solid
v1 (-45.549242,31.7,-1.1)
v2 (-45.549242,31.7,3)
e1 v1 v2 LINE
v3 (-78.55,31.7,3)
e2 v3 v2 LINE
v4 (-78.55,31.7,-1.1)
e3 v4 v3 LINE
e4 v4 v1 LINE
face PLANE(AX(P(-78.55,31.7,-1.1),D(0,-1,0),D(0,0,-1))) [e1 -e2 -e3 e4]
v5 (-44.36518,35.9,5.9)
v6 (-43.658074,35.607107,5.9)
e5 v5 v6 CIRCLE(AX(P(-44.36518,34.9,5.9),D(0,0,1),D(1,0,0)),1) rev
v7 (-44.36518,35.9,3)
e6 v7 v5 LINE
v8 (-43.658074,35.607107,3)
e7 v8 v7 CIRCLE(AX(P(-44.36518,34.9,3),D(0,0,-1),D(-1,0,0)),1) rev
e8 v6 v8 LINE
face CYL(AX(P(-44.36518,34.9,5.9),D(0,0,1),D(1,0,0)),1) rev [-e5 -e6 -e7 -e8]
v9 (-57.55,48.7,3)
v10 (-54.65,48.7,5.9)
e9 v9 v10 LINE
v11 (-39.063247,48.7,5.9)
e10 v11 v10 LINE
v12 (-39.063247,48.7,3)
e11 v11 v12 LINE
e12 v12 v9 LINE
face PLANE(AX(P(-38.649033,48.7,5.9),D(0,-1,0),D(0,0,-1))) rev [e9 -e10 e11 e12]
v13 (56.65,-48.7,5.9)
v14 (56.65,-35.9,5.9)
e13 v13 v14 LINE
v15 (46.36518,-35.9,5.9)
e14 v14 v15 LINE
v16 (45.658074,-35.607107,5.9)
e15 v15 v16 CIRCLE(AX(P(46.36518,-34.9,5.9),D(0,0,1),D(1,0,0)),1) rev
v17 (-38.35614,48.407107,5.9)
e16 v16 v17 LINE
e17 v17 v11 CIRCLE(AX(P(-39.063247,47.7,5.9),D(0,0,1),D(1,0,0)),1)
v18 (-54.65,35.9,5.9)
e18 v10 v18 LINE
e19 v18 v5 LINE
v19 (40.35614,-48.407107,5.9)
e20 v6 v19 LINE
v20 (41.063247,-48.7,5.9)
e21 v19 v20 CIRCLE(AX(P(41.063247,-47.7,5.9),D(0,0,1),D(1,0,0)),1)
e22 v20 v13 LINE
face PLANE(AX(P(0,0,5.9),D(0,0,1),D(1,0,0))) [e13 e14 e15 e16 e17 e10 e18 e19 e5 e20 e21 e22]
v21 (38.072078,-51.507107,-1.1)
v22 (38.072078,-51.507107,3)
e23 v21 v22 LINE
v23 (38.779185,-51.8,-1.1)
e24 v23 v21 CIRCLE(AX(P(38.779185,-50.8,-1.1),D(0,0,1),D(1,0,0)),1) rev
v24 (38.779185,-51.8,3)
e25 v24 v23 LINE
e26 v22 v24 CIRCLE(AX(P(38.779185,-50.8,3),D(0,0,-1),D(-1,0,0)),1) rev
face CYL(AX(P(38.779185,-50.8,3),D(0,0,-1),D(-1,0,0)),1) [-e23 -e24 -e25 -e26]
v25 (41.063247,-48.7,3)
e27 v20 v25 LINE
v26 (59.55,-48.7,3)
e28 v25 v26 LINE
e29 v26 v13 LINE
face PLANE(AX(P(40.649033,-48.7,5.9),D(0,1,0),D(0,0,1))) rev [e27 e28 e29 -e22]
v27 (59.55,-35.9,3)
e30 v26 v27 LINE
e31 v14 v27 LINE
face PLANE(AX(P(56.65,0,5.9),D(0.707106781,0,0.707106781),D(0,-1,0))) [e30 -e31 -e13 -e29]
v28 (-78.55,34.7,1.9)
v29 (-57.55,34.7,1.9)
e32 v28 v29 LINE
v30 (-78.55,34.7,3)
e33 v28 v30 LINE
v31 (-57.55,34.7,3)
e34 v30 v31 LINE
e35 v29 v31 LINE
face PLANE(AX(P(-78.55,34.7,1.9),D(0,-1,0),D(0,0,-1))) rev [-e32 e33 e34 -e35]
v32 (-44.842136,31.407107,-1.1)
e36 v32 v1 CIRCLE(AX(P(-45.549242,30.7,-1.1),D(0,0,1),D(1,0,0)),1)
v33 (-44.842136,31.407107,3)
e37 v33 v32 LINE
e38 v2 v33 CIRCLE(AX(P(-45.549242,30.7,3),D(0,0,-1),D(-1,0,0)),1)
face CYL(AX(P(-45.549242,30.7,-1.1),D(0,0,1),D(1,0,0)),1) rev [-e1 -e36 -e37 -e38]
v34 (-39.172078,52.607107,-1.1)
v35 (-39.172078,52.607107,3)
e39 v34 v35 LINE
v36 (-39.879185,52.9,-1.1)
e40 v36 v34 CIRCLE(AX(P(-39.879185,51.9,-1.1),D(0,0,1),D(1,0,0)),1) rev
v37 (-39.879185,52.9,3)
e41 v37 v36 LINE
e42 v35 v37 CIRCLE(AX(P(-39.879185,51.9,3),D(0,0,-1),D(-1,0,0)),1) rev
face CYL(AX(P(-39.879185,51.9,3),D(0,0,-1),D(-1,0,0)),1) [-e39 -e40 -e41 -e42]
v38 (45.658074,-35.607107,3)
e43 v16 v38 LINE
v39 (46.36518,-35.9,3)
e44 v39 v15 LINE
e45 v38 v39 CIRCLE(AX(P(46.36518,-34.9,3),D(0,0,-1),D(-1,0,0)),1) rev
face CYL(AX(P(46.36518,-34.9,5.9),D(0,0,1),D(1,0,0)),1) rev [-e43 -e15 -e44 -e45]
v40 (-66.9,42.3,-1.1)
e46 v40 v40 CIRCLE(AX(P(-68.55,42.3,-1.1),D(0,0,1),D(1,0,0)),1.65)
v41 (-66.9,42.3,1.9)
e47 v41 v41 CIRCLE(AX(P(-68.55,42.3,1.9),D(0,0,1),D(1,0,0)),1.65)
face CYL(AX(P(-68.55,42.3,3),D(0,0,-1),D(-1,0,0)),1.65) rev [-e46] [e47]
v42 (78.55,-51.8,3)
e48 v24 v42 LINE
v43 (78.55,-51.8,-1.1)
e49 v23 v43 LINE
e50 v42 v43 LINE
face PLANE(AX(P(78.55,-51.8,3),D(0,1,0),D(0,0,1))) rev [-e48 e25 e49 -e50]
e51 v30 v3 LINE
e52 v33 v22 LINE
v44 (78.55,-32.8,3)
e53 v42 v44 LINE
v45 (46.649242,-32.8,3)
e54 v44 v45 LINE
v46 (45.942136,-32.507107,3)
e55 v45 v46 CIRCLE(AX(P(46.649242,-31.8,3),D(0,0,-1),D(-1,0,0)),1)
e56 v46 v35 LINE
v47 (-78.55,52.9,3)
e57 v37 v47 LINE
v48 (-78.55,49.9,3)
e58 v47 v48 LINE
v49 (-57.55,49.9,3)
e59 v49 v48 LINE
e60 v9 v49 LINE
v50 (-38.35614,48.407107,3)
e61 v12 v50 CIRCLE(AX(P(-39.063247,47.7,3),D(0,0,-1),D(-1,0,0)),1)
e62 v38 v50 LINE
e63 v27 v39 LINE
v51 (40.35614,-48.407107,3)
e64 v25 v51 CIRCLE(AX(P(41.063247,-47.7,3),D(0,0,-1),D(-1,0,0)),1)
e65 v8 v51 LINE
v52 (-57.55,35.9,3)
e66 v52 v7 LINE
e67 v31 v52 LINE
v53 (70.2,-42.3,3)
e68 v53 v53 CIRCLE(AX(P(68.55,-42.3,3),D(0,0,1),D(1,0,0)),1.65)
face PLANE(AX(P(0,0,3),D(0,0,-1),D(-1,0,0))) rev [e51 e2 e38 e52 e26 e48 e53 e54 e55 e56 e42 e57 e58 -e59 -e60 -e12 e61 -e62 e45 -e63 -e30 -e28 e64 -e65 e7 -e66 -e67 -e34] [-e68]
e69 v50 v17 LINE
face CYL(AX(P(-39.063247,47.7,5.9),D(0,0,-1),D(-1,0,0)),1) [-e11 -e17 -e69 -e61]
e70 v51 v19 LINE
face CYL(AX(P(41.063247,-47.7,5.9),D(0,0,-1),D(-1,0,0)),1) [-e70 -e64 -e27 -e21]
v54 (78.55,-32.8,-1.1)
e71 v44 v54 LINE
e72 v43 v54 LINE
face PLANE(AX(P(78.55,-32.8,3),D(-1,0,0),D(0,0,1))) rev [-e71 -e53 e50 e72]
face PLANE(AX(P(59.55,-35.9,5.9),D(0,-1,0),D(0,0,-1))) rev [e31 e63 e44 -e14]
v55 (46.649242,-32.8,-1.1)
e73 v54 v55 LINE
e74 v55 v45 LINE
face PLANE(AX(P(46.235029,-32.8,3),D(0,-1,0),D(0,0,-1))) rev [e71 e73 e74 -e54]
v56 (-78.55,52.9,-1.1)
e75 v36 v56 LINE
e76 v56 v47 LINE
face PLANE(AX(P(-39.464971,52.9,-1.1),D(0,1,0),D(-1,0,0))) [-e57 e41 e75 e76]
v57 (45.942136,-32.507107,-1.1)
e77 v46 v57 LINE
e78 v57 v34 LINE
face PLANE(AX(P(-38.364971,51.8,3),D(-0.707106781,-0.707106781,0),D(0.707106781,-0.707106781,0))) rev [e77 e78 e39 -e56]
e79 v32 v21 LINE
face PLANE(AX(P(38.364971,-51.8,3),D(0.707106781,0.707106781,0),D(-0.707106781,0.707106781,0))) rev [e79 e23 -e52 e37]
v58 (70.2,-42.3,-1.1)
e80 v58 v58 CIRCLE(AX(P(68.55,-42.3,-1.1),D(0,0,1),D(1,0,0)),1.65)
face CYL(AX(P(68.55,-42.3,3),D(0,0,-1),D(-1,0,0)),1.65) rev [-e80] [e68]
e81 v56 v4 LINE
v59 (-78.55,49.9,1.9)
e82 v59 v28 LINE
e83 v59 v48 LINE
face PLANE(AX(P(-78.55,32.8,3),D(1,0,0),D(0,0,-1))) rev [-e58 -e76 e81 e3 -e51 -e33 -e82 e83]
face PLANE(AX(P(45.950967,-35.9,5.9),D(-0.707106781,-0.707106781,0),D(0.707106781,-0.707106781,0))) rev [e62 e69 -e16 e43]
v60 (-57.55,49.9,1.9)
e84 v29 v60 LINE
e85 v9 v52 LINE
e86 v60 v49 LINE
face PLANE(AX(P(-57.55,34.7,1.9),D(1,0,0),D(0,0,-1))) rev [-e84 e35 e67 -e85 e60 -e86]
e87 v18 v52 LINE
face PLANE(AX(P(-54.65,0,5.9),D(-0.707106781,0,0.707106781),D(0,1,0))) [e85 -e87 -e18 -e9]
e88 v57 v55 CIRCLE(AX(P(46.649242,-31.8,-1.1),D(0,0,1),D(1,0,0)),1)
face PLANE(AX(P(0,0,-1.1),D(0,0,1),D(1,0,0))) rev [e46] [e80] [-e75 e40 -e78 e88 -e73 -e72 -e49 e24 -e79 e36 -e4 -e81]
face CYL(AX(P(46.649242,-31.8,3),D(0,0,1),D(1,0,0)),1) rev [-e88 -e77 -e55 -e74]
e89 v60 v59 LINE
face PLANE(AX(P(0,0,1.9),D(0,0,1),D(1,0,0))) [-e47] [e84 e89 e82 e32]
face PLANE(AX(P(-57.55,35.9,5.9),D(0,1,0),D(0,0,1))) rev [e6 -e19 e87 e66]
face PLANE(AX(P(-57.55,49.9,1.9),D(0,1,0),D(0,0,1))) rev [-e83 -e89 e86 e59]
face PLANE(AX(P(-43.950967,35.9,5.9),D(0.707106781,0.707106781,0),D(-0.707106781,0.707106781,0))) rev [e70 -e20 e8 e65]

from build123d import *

# Parameters (mm, degrees)
SKETCH_1_R          = 1.65
EXTRUDE_1_DEPTH     = 3
EXTRUDE_2_DEPTH     = 2.9
CHAMFER_1_SIZE      = 2.9
EXTRUDE_START       = -1.1
SKETCH_6_R          = 1.65
EXTRUDE_3_DEPTH     = 4.1
CUT_EXTRUDE_START   = 3
SKETCH_7_W          = 21
SKETCH_7_H          = 15.2
CUT_EXTRUDE_1_DEPTH = 1.1
FILLET_1_R          = 1


with BuildPart() as part:
    # 草图1 → 凸台-拉伸1 (new body)
    with BuildSketch(Plane.XY):
        Polygon((-78.55, 51.8), (-38.364971157, 51.8), (46.235028843, -32.8), (78.55, -32.8), (78.55, -51.8), (38.364971157, -51.8), (-46.235028843, 32.8), (-78.55, 32.8), align=None)
        with Locations((-68.55, 42.3)):
            Circle(SKETCH_1_R, mode=Mode.SUBTRACT)
        with Locations((68.55, -42.3)):
            Circle(SKETCH_1_R, mode=Mode.SUBTRACT)
    extrude(amount=EXTRUDE_1_DEPTH)

    # 草图2 → 凸台-拉伸2 (add)
    with BuildSketch(Plane.XY.offset(3)):
        Polygon((-57.55, 48.7), (-57.55, 35.9), (-43.950966799, 35.9), (40.649033201, -48.7), (59.55, -48.7), (59.55, -35.9), (45.950966799, -35.9), (-38.649033201, 48.7), align=None)
    extrude(amount=EXTRUDE_2_DEPTH)

    # 倒角1
    chamfer_1_edges = [part.edges().sort_by_distance(p)[0] for p in [
        (59.55, -42.3, 5.9),
        (-57.55, 42.3, 5.9),
    ]]
    chamfer(chamfer_1_edges, length=CHAMFER_1_SIZE - 0.0001)  # a hair under: the kernel refuses the full size

    # 草图6 → 凸台-拉伸3 (add)
    with BuildSketch(Plane.XY.offset(EXTRUDE_START)):
        Polygon((-78.55, 52.9), (-78.55, 31.7), (-45.135028843, 31.7), (38.364971157, -51.8), (78.55, -51.8), (78.55, -32.8), (46.235028843, -32.8), (-39.464971157, 52.9), align=None)
        with Locations((-68.55, 42.3)):
            Circle(SKETCH_6_R, mode=Mode.SUBTRACT)
        with Locations((68.55, -42.3)):
            Circle(SKETCH_6_R, mode=Mode.SUBTRACT)
    extrude(amount=EXTRUDE_3_DEPTH)

    # 草图7 → 切除-拉伸1 (cut)
    with BuildSketch(Plane.XY.offset(CUT_EXTRUDE_START)):
        with Locations((-68.05, 42.3)):
            Rectangle(SKETCH_7_W, SKETCH_7_H)
    extrude(amount=-CUT_EXTRUDE_1_DEPTH, mode=Mode.SUBTRACT)

    # 圆角1
    fillet_1_edges = [part.edges().sort_by_distance(p)[0] for p in [
        (46.235028843, -32.8, 0.95),
        (38.364971157, -51.8, 0.95),
        (-38.649033201, 48.7, 4.45),
        (-43.950966799, 35.9, 4.45),
        (40.649033201, -48.7, 4.45),
        (45.950966799, -35.9, 4.45),
        (-39.464971157, 52.9, 0.95),
        (-45.135028843, 31.7, 0.95),
    ]]
    fillet(fillet_1_edges, radius=FILLET_1_R)


solid = part.part
